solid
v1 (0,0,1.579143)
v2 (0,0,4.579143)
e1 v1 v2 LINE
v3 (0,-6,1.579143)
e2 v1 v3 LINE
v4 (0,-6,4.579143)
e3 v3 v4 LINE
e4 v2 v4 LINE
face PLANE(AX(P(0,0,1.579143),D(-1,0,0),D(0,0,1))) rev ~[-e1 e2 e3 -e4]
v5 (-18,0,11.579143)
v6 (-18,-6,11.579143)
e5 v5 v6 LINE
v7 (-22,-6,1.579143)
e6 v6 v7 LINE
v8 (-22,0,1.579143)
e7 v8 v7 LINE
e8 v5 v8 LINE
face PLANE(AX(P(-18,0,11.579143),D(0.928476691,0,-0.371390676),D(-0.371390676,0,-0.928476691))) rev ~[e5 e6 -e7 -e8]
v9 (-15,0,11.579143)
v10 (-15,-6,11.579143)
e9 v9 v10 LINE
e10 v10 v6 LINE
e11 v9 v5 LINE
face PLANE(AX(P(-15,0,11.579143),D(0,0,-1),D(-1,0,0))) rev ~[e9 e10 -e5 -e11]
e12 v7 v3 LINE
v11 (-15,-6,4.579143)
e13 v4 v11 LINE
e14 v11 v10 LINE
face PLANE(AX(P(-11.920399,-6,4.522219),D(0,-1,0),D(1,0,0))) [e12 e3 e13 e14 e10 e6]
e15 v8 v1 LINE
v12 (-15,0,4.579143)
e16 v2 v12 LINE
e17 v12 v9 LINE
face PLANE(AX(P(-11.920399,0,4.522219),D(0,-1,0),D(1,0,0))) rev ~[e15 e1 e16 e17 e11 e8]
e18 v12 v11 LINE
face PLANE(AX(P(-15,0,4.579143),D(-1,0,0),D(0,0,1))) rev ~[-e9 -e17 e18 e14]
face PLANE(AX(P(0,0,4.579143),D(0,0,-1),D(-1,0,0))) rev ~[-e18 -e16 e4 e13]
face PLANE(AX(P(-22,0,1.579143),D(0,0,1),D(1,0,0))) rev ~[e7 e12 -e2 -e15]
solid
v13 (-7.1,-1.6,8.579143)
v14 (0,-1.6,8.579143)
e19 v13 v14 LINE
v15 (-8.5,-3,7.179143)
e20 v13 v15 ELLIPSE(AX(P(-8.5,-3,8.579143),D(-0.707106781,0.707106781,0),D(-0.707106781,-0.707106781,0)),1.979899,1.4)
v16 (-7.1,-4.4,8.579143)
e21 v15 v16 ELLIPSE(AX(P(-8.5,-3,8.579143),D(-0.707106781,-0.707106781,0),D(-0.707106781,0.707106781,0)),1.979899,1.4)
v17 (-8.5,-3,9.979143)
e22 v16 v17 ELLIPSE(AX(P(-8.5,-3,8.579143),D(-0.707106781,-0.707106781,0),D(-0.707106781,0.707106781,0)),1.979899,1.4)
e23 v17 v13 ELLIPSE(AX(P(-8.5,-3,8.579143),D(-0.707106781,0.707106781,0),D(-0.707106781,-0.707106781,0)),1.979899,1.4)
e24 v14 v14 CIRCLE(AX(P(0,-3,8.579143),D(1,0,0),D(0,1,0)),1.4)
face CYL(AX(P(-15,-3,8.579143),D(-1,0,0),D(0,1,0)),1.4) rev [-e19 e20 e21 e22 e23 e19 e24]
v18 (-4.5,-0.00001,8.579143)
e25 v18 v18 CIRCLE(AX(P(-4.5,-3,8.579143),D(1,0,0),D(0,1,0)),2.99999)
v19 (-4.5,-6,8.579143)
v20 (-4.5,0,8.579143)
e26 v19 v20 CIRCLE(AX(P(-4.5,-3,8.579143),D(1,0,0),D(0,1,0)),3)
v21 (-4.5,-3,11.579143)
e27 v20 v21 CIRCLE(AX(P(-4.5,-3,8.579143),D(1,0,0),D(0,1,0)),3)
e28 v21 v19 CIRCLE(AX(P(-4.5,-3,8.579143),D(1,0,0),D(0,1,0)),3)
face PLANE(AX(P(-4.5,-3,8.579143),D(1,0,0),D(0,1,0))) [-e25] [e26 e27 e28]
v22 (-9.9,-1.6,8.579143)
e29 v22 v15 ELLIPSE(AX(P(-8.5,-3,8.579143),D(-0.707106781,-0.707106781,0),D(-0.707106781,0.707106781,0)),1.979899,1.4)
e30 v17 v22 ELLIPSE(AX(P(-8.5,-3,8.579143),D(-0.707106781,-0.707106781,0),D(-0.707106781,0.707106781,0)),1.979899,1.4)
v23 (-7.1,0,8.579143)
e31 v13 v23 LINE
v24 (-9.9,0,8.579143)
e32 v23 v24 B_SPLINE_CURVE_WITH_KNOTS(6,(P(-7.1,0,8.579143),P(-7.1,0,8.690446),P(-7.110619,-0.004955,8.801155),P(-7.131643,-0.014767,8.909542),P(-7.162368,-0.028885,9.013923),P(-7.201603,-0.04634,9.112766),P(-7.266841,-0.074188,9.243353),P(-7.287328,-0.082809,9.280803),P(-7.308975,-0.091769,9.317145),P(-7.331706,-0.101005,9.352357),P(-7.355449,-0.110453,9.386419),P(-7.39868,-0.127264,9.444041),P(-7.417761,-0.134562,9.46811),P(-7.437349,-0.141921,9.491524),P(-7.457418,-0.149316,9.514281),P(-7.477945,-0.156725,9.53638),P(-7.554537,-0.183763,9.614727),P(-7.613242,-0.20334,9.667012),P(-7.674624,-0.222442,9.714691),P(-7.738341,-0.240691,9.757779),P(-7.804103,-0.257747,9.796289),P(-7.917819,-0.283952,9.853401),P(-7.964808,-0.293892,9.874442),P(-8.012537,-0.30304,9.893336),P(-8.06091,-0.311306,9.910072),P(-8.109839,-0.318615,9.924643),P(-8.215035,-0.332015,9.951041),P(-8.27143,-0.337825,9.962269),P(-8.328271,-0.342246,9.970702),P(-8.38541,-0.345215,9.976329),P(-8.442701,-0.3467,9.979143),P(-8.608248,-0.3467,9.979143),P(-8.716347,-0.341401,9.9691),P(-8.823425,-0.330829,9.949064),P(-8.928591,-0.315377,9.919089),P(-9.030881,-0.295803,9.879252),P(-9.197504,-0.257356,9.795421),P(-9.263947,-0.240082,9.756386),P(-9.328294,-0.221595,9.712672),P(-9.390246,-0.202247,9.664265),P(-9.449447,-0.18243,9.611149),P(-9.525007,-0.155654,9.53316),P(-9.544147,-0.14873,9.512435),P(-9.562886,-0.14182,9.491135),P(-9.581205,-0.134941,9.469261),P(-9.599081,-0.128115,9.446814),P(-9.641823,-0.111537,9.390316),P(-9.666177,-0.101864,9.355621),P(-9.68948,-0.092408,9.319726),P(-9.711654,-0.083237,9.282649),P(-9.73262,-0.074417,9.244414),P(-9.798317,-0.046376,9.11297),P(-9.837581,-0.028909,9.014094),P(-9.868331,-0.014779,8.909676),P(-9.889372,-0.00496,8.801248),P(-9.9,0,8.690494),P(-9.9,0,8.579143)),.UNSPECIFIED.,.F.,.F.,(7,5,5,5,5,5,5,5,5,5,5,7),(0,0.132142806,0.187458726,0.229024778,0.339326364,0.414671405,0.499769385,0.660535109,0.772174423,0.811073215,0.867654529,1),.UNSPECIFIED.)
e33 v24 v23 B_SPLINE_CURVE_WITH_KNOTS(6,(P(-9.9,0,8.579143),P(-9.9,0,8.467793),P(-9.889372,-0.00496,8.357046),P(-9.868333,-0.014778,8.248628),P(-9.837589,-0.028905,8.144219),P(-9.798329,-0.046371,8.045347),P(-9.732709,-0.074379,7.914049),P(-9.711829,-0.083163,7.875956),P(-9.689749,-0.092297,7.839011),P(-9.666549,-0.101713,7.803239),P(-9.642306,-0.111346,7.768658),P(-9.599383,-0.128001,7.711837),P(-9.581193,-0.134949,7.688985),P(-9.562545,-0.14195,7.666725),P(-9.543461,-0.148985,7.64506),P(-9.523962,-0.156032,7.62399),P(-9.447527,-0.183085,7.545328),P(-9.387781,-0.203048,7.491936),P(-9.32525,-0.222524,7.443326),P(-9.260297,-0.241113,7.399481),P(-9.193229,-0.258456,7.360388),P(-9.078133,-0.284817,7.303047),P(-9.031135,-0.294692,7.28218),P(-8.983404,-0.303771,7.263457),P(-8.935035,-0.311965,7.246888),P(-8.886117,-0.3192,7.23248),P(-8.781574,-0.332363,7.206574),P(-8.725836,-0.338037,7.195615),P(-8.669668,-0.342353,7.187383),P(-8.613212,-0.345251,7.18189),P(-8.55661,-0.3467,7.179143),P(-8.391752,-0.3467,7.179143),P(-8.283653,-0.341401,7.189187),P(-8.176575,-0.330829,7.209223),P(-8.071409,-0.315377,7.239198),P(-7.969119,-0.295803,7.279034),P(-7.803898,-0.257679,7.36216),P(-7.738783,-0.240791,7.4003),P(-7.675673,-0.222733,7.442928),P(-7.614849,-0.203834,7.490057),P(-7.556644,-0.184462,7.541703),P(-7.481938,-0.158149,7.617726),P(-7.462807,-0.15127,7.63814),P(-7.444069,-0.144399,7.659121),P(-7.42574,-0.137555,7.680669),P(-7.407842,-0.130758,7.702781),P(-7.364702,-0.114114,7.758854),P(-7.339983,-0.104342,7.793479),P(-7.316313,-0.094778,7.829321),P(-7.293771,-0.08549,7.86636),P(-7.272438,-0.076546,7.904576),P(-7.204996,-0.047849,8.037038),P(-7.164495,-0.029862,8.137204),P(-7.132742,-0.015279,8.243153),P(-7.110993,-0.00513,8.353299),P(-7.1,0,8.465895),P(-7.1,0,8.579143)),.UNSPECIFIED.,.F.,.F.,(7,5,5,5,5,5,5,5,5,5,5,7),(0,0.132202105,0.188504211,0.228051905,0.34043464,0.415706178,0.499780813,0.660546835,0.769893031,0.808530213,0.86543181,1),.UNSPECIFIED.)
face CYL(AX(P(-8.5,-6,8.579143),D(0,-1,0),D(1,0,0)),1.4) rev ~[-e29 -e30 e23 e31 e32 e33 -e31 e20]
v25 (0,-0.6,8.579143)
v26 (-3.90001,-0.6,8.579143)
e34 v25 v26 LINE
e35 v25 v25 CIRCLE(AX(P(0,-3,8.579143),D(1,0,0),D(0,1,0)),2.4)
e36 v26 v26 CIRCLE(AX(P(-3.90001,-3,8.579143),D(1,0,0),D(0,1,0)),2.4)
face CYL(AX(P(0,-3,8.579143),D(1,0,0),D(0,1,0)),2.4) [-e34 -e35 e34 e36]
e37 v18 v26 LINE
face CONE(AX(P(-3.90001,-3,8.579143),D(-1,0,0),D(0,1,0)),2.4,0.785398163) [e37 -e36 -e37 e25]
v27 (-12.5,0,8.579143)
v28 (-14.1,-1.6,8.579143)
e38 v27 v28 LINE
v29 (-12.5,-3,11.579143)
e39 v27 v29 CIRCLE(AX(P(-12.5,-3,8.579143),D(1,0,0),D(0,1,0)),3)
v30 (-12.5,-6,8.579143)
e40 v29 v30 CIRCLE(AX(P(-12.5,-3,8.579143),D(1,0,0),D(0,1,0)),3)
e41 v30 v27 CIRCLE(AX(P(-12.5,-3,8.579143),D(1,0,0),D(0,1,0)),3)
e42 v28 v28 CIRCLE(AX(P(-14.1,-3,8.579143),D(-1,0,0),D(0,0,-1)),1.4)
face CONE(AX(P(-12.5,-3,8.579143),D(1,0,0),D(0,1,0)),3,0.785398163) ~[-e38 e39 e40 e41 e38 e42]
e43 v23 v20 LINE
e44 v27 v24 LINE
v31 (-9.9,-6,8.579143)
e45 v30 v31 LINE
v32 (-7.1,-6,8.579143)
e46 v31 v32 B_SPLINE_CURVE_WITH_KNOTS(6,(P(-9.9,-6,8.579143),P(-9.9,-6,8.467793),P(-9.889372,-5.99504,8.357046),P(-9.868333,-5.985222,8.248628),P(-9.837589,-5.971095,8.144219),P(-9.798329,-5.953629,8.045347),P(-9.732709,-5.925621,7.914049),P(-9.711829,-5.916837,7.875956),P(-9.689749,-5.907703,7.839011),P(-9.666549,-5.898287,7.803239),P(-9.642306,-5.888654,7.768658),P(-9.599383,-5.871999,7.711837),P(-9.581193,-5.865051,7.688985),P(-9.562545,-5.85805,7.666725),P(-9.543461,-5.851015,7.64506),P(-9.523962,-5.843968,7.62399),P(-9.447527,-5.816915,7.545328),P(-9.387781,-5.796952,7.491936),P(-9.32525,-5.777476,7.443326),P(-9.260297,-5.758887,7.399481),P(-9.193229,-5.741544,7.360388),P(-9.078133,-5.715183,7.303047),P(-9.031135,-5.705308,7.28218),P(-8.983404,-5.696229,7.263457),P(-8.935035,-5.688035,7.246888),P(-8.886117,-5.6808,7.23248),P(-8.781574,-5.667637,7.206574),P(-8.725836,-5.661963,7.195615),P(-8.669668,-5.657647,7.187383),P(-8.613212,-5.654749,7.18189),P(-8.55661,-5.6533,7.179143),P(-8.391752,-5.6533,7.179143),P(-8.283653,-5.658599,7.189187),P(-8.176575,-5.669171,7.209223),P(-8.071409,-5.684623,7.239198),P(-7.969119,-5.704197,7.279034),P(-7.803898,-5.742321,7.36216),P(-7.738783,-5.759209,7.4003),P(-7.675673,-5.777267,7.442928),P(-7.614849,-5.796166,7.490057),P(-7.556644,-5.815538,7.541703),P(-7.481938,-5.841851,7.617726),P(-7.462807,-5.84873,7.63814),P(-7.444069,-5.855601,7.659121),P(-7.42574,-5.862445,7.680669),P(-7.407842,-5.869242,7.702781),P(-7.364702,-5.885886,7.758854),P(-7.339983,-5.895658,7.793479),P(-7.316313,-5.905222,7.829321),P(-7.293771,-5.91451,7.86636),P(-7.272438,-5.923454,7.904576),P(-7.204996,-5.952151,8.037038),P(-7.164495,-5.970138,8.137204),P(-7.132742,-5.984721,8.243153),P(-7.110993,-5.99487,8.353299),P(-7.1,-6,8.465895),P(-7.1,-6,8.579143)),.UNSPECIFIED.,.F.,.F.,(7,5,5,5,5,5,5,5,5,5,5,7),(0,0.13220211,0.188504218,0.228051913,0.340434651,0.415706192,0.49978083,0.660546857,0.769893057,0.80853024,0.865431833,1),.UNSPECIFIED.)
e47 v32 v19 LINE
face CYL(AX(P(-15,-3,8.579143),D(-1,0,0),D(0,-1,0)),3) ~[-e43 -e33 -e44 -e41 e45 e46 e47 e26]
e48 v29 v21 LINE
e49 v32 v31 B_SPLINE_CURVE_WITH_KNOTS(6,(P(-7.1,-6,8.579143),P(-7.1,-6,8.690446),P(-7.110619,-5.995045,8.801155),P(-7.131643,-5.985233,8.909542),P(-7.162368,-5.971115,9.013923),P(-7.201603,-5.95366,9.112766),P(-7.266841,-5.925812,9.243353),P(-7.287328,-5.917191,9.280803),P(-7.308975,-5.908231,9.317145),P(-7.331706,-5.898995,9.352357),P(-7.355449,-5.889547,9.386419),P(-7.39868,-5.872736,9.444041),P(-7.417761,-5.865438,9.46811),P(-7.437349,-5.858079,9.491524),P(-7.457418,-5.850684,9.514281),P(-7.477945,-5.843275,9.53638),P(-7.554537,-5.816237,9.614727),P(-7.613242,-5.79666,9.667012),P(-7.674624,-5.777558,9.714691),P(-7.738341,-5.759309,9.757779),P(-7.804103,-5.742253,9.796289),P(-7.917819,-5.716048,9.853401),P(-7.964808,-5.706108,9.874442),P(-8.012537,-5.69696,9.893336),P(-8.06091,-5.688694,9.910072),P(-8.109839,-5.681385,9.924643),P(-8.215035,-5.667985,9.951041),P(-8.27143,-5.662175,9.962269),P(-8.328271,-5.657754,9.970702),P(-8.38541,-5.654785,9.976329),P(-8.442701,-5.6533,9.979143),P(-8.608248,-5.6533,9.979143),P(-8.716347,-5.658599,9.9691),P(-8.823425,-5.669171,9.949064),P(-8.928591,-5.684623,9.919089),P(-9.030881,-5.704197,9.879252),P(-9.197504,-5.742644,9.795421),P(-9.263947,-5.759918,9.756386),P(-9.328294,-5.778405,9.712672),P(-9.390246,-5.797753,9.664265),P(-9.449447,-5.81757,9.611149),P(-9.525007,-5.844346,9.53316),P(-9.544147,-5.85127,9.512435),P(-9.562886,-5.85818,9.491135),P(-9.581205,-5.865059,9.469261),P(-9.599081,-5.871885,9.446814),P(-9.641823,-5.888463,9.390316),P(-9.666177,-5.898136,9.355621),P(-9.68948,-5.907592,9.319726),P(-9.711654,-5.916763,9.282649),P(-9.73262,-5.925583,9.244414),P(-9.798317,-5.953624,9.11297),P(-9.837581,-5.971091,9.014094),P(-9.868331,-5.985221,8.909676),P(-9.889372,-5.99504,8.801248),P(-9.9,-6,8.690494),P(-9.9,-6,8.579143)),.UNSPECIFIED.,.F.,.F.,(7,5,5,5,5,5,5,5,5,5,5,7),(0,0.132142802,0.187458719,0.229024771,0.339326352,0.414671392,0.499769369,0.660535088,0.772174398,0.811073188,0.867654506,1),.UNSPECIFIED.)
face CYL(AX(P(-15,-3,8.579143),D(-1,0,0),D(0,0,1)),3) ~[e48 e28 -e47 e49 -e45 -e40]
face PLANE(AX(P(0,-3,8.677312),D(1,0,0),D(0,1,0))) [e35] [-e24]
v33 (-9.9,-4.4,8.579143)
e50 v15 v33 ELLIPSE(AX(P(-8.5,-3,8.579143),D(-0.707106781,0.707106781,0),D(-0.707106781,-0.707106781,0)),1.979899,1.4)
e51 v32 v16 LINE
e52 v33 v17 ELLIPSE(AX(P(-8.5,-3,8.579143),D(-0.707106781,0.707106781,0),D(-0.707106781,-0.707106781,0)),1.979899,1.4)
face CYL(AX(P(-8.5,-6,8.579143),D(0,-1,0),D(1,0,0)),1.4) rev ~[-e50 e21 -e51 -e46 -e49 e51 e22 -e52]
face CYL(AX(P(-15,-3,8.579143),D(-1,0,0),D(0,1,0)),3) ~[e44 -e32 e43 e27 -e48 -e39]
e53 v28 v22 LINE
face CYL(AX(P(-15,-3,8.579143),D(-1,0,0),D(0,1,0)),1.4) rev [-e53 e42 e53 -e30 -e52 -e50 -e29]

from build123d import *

# Parameters (mm, degrees)
F1_DEPTH = 6
F2_R     = 1.4
F3_DEPTH = 15
F5_R     = 1.4
F6_DEPTH = 25
F7_R     = 3
F7_R_2   = 2.4
F8_DEPTH = 4.5
F9_SIZE  = 0.59999


# Not quite as in the source:
# - a fillet or chamfer that OpenCascade refuses, or shapes differently, is made with other operations: its cross-section is extruded or revolved along the edge and cut away or added
# - a fillet or chamfer is up to 0.001 mm smaller than in the source, because OpenCascade refuses the exact size


with BuildPart() as f1:
    # F0 (on Front) → F1 (new body)
    with BuildSketch(Plane.XZ):
        Polygon((0, 4.5791433678), (-15, 4.5791433678), (-15, 11.5791433678), (-18, 11.5791433678), (-22, 1.5791433678), (0, 1.5791433678), align=None)
    extrude(amount=F1_DEPTH)


with BuildPart() as f3:
    # F2 (on face) → F3 (new body, through all)
    with BuildSketch(Plane.YZ.offset(-15)):
        with BuildLine():
            ThreePointArc((-6, 8.5791433678), (-3, 5.5791433678), (0, 8.5791433678))
            ThreePointArc((0, 8.5791433678), (-0.8786796564, 10.7004637114), (-3, 11.5791433678))
            ThreePointArc((-3, 11.5791433678), (-5.1213203436, 10.7004637114), (-6, 8.5791433678))
        make_face()
        with Locations((-3, 8.5791433678)):
            Circle(F2_R, mode=Mode.SUBTRACT)
    extrude(amount=F3_DEPTH)

    # F4: chamfer of 2.5 on 1 edges, made by hand

    # F4_s1 → F4_t2 (revolve, cut)
    with BuildSketch(Plane.XY.offset(8.5791433678)):
        Polygon((-12.5, 0), (-15, -2.5), (-15, 0), align=None)
    revolve(axis=Axis((-15, -3, 8.5791433678), (1, 0, 0)), mode=Mode.SUBTRACT)

    # F5 (on face) → F6 (cut)
    with BuildSketch(Plane.XZ.offset(6)):
        with Locations((-8.5, 8.5791433678)):
            Circle(F5_R)
    extrude(amount=-F6_DEPTH, mode=Mode.SUBTRACT)

    # F7 (on face) → F8 (cut)
    with BuildSketch(Plane.YZ):
        with Locations((-3, 8.5791433678)):
            Circle(F7_R)
        with Locations((-3, 8.5791433678)):
            Circle(F7_R_2, mode=Mode.SUBTRACT)
    extrude(amount=-F8_DEPTH, mode=Mode.SUBTRACT)

    # F9 (size 0.6 in the source; OpenCascade refuses exactly that, so slightly less here)
    f9_edges = [f3.edges().sort_by_distance(p)[0] for p in [
        (-4.5, -5.4, 8.579143),
    ]]
    chamfer(f9_edges, length=F9_SIZE)


solid = Compound([f1.part, f3.part])
